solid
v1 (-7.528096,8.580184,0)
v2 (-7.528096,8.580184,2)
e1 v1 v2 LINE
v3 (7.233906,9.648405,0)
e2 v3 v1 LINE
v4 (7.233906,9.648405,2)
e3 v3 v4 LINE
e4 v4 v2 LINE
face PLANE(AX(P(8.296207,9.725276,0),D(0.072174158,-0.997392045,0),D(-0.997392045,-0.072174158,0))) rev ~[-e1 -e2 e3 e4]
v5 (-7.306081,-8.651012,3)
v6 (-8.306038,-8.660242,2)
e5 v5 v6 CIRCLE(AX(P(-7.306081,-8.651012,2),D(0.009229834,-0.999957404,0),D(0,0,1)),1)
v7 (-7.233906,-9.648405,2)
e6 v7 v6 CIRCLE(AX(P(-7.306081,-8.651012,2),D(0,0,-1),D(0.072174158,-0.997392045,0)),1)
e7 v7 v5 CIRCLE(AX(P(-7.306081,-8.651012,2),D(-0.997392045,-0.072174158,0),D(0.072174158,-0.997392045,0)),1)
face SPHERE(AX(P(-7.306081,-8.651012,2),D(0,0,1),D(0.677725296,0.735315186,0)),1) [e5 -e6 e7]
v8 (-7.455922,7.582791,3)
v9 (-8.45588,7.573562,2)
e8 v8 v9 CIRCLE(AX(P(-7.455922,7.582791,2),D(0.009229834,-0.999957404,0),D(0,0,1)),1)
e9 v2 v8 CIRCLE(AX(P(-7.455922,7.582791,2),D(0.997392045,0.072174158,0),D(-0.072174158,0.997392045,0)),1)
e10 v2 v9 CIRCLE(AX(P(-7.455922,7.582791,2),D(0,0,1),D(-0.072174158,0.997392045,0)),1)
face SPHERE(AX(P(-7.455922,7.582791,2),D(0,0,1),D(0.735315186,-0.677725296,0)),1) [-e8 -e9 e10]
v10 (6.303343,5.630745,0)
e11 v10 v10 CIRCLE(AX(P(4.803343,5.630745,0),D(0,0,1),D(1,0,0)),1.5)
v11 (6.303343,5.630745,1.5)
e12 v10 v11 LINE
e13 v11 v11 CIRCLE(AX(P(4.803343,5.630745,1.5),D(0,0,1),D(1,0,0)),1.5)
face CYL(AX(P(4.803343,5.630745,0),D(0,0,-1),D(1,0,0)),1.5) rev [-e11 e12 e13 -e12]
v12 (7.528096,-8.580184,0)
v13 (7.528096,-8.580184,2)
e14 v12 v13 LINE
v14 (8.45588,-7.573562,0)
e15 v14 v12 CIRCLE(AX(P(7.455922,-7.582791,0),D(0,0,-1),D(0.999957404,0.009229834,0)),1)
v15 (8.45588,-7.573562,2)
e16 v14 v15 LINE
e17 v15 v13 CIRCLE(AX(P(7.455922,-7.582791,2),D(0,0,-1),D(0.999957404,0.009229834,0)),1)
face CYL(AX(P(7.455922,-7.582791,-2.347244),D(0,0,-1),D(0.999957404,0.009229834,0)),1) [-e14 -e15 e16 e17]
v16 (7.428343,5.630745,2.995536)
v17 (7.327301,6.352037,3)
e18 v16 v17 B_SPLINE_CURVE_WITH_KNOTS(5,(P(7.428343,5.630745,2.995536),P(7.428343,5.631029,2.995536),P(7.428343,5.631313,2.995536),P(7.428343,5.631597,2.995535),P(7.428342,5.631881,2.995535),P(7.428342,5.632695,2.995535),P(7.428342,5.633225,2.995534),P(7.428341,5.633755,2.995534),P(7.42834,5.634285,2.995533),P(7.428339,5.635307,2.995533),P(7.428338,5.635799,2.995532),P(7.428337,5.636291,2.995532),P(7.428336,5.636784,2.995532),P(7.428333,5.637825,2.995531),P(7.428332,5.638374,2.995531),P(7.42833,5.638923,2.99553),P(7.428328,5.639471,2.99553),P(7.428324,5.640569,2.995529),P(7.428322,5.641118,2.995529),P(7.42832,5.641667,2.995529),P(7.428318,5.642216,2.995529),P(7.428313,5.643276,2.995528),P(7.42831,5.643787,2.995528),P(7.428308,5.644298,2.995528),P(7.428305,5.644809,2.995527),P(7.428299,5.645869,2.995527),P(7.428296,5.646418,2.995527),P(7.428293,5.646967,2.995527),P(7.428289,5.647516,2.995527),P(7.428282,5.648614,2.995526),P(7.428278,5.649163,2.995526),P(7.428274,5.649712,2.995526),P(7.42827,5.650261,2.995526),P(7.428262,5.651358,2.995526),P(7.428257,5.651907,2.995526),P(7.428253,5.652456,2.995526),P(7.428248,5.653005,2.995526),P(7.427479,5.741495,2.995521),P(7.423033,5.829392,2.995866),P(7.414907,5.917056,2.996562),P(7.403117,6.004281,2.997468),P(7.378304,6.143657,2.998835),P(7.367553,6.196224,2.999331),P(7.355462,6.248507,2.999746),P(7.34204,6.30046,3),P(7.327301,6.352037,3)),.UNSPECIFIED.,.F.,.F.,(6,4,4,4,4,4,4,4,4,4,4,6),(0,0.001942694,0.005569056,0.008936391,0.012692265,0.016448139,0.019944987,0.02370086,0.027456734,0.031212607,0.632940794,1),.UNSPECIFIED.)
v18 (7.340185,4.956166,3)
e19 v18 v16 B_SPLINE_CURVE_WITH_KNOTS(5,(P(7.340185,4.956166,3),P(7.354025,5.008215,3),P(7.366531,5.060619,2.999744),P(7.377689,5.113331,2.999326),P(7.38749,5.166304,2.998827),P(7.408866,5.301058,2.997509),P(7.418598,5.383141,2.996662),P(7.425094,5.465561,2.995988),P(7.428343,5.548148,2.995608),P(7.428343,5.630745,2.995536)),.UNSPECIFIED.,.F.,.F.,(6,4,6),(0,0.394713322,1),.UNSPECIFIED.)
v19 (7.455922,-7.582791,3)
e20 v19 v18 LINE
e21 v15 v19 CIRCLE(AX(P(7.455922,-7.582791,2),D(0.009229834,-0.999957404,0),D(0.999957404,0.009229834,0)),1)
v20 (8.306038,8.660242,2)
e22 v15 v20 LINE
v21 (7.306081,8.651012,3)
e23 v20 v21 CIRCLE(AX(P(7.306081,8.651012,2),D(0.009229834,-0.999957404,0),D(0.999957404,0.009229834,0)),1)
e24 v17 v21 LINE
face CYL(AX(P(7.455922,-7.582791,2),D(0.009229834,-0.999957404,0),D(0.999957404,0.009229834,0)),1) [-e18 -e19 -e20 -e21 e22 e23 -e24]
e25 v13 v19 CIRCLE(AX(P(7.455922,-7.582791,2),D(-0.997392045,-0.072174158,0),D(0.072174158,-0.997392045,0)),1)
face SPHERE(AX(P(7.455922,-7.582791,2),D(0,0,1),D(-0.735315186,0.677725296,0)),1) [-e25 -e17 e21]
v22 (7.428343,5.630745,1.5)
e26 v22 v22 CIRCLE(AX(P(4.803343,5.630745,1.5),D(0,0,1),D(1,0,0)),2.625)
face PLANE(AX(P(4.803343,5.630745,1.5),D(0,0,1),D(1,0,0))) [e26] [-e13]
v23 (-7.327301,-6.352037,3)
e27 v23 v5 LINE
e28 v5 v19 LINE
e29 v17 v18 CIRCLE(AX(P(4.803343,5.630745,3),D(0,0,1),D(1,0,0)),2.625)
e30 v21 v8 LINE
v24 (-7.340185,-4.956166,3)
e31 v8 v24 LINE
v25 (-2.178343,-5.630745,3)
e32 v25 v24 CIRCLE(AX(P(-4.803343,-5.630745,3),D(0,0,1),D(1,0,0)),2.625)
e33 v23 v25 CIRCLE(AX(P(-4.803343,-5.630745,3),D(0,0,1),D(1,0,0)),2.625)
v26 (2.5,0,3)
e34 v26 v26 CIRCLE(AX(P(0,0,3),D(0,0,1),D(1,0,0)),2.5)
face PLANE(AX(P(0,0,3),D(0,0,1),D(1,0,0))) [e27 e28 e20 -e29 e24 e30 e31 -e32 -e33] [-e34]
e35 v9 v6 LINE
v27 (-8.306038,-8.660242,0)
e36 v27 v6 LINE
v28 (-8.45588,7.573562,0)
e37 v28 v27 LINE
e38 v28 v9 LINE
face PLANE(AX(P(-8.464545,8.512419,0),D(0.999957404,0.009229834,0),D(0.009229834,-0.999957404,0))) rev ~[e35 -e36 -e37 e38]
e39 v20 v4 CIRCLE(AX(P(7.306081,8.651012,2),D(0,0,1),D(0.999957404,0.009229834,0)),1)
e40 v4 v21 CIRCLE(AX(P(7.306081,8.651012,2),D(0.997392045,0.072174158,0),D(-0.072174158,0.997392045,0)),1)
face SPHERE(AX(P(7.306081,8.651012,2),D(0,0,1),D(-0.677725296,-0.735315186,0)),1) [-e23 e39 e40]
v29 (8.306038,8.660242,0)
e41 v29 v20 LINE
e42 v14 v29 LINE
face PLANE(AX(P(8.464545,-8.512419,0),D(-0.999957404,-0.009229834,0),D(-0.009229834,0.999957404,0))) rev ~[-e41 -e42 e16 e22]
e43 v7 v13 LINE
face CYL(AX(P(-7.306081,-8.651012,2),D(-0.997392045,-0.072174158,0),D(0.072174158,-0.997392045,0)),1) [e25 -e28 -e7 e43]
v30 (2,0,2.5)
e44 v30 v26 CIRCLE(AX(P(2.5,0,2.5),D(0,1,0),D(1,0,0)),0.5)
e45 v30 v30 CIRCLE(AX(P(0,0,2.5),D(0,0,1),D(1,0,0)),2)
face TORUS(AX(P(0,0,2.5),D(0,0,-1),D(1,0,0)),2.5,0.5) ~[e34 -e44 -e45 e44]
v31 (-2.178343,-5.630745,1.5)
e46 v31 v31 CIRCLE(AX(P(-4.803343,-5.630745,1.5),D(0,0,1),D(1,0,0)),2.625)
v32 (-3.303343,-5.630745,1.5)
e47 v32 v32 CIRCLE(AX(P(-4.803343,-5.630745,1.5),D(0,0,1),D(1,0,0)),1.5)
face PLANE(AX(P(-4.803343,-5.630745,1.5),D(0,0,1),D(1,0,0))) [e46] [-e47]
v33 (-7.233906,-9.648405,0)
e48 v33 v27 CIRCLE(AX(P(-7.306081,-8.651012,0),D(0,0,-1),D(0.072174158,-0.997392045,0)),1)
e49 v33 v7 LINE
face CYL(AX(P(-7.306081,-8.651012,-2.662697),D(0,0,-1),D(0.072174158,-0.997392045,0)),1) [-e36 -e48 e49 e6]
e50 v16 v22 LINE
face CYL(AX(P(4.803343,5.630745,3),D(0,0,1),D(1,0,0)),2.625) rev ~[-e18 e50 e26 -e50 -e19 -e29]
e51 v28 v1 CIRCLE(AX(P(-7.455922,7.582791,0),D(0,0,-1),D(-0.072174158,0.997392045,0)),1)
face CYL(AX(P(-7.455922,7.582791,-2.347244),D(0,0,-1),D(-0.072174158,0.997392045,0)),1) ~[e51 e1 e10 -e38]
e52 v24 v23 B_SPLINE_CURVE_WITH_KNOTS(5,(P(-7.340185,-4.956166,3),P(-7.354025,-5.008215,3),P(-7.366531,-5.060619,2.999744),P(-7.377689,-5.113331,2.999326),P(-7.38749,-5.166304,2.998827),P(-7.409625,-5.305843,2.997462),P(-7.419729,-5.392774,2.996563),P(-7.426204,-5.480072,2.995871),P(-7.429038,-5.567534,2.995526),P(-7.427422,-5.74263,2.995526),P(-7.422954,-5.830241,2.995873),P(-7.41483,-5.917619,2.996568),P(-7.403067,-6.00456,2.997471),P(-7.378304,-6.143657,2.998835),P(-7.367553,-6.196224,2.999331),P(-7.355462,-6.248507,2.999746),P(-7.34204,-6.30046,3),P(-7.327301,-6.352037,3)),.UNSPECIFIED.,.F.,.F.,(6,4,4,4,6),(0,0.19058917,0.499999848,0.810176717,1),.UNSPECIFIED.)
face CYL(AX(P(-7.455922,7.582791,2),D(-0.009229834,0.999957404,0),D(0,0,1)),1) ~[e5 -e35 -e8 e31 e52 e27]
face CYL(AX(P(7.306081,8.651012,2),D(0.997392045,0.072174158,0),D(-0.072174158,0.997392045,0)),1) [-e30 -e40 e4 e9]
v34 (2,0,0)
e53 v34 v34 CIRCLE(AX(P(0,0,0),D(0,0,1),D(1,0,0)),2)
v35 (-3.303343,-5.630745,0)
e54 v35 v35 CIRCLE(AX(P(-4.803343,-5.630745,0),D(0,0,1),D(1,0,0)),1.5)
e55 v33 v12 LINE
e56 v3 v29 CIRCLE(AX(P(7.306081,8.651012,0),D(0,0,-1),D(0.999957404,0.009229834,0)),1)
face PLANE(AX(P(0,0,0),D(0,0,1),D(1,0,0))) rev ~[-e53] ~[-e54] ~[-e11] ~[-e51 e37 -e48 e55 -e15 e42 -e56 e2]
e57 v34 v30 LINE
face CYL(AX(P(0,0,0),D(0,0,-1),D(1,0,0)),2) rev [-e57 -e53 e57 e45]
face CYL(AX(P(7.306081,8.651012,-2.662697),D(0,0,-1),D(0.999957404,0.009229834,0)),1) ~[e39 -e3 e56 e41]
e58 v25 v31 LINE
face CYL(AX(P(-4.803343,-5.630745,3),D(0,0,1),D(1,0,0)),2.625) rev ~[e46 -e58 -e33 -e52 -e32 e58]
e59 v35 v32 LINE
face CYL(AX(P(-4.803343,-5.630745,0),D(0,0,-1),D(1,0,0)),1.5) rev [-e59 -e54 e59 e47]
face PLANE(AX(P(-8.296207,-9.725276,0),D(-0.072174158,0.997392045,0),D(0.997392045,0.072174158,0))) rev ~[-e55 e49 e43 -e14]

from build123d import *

# Parameters (mm, degrees)
F0_R         = 1.5
F0_R_2       = 2
F1_DEPTH     = 3
F2_R         = 2.625
F2_R_2       = 1.5
F3_DEPTH     = 1.5
F4_T1_DEPTH  = 4.3472443006
F4_T3_DEPTH  = 16.2344954865
F4_T5_DEPTH  = 14.8006020278
F4_T7_DEPTH  = 4.6626968477
F4_T9_DEPTH  = 16.2344954865
F4_T11_DEPTH = 14.8006020278
F4_T16_DEPTH = 1
F4_T22_DEPTH = 1
F4_T28_DEPTH = 1
F4_T34_DEPTH = 1
F5_R         = 0.5


# Not quite as in the source:
# - a fillet or chamfer that OpenCascade refuses, or shapes differently, is made with other operations: its cross-section is extruded or revolved along the edge and cut away or added


with BuildPart() as f1:
    # F0 (on Top) → F1 (new body)
    with BuildSketch(Plane.XY):
        Polygon((8.4645454874, -8.5124193832), (8.2962074114, 9.7252756798), (-8.4645454874, 8.5124193832), (-8.2962074114, -9.7252756798), align=None)
        with Locations((-4.8033426305, -5.6307453454)):
            Circle(F0_R, mode=Mode.SUBTRACT)
        Polygon((4.02705255, 0.3354530665), (2.3040371523, -3.3198032774), (-1.7230153977, -3.6552563439), (-4.02705255, -0.3354530665), (-2.3040371523, 3.3198032774), (1.7230153977, 3.6552563439), align=None, mode=Mode.SUBTRACT)
        with Locations((4.8033426305, 5.6307453454)):
            Circle(F0_R, mode=Mode.SUBTRACT)
        Polygon((-1.7230153977, -3.6552563439), (2.3040371523, -3.3198032774), (4.02705255, 0.3354530665), (1.7230153977, 3.6552563439), (-2.3040371523, 3.3198032774), (-4.02705255, -0.3354530665), align=None)
        Circle(F0_R_2, mode=Mode.SUBTRACT)
    extrude(amount=F1_DEPTH)

    # F2 (on face) → F3 (cut)
    with BuildSketch(Plane.XY.offset(3)):
        with Locations((-4.8033426305, -5.6307453454)):
            Circle(F2_R)
        with Locations((-4.8033426305, -5.6307453454)):
            Circle(F2_R_2, mode=Mode.SUBTRACT)
        with Locations((4.8033426305, 5.6307453454)):
            Circle(F2_R)
        with Locations((4.8033426305, 5.6307453454)):
            Circle(F2_R_2, mode=Mode.SUBTRACT)
    extrude(amount=-F3_DEPTH, mode=Mode.SUBTRACT)

    # F4: fillet of radius 1 on 8 edges, made by hand

    # F4_s2 → F4_t1 (cut)
    with BuildSketch(Plane.XY.offset(-2.3472443006)):
        with BuildLine():
            ThreePointArc((-7.5280963703, 8.5801835352), (-8.1912373991, 8.2605167863), (-8.4558796169, 7.573561656))
            Line((-8.4558796169, 7.573561656), (-8.4645454874, 8.5124193832))
            Line((-8.4645454874, 8.5124193832), (-7.5280963703, 8.5801835352))
        make_face()
        with BuildLine():
            ThreePointArc((8.4558796169, -7.573561656), (8.1912373991, -8.2605167863), (7.5280963703, -8.5801835352))
            Line((7.5280963703, -8.5801835352), (8.4645454874, -8.5124193832))
            Line((8.4645454874, -8.5124193832), (8.4558796169, -7.573561656))
        make_face()
    extrude(amount=F4_T1_DEPTH, mode=Mode.SUBTRACT)

    # F4_s4 → F4_t3 (cut)
    with BuildSketch(Plane(origin=(-0.0706200975, 7.6509595097, 0), x_dir=(0, 0, 1), z_dir=(0.0092298344, -0.9999574042, 0))):
        with BuildLine():
            ThreePointArc((3, 7.3856167117), (2.7071067812, 8.0927234929), (2, 8.3856167117))
            Line((2, 8.3856167117), (3, 8.3856167117))
            Line((3, 8.3856167117), (3, 7.3856167117))
        make_face()
    extrude(amount=F4_T3_DEPTH, mode=Mode.SUBTRACT)

    # F4_s6 → F4_t5 (cut)
    with BuildSketch(Plane(origin=(7.8907735218, 0.570999072, 0), x_dir=(0, 0, 1), z_dir=(-0.9973920448, -0.0721741576, 0))):
        with BuildLine():
            ThreePointArc((2, 9.1011408148), (2.7071067812, 8.808247596), (3, 8.1011408148))
            Line((3, 8.1011408148), (3, 9.1011408148))
            Line((3, 9.1011408148), (2, 9.1011408148))
        make_face()
    extrude(amount=F4_T5_DEPTH, mode=Mode.SUBTRACT)

    # F4_s8 → F4_t7 (cut)
    with BuildSketch(Plane.XY.offset(-2.6626968477)):
        with BuildLine():
            ThreePointArc((8.3060379118, 8.6602423087), (7.9838058035, 9.3863276607), (7.23390635, 9.648404519))
            Line((7.23390635, 9.648404519), (8.2962074114, 9.7252756798))
            Line((8.2962074114, 9.7252756798), (8.3060379118, 8.6602423087))
        make_face()
        with BuildLine():
            ThreePointArc((-7.23390635, -9.648404519), (-7.9838058035, -9.3863276607), (-8.3060379118, -8.6602423087))
            Line((-8.3060379118, -8.6602423087), (-8.2962074114, -9.7252756798))
            Line((-8.2962074114, -9.7252756798), (-7.23390635, -9.648404519))
        make_face()
    extrude(amount=F4_T7_DEPTH, mode=Mode.SUBTRACT)

    # F4_s10 → F4_t9 (cut)
    with BuildSketch(Plane(origin=(0.0706200975, -7.6509595097, 0), x_dir=(0, 0, 1), z_dir=(-0.0092298344, 0.9999574042, 0))):
        with BuildLine():
            ThreePointArc((2, 8.3856167117), (2.7071067812, 8.0927234929), (3, 7.3856167117))
            Line((3, 7.3856167117), (3, 8.3856167117))
            Line((3, 8.3856167117), (2, 8.3856167117))
        make_face()
    extrude(amount=F4_T9_DEPTH, mode=Mode.SUBTRACT)

    # F4_s12 → F4_t11 (cut)
    with BuildSketch(Plane(origin=(-7.8907735218, -0.570999072, 0), x_dir=(0, 0, 1), z_dir=(0.9973920448, 0.0721741576, 0))):
        with BuildLine():
            ThreePointArc((2, 9.1011408148), (2.7071067812, 8.808247596), (3, 8.1011408148))
            Line((3, 8.1011408148), (3, 9.1011408148))
            Line((3, 9.1011408148), (2, 9.1011408148))
        make_face()
    extrude(amount=F4_T11_DEPTH, mode=Mode.SUBTRACT)


with BuildPart() as f4_tool14:
    # F4_s15 → F4_t16 (new body)
    with BuildSketch(Plane.XY.offset(2)):
        Polygon((-7.4559222127, 7.5827914904), (-8.4558796169, 7.573561656), (-8.4645454874, 8.5124193832), (-7.5280963703, 8.5801835352), align=None)
    extrude(amount=F4_T16_DEPTH)

    # F4_s17 → F4_t18 (revolve, cut)
    with BuildSketch(Plane(origin=(-7.4559222127, 7.5827914904, 2), x_dir=(0.7353151864, -0.6777252959, 0), z_dir=(-0.6777252959, -0.7353151864, 0))):
        with BuildLine():
            ThreePointArc((0, -1), (1, 0), (0, 1))
            Line((0, 1), (0, -1))
        make_face()
    revolve(axis=Axis((-7.4559222127, 7.5827914904, 2), (0, 0, 1)), mode=Mode.SUBTRACT)


with BuildPart() as f1_1:
    add(f1.part)

    # F4_t13: cut F4_tool14
    add(f4_tool14.part, mode=Mode.SUBTRACT)


with BuildPart() as f4_tool20:
    # F4_s21 → F4_t22 (new body)
    with BuildSketch(Plane.XY.offset(2)):
        Polygon((-7.3060805076, -8.6510124742), (-8.3060379118, -8.6602423087), (-8.2962074114, -9.7252756798), (-7.23390635, -9.648404519), align=None)
    extrude(amount=F4_T22_DEPTH)

    # F4_s23 → F4_t24 (revolve, cut)
    with BuildSketch(Plane(origin=(-7.3060805076, -8.6510124742, 2), x_dir=(0.6777252959, 0.7353151864, 0), z_dir=(0.7353151864, -0.6777252959, 0))):
        with BuildLine():
            ThreePointArc((0, -1), (1, 0), (0, 1))
            Line((0, 1), (0, -1))
        make_face()
    revolve(axis=Axis((-7.3060805076, -8.6510124742, 2), (0, 0, 1)), mode=Mode.SUBTRACT)


with BuildPart() as f1_2:
    add(f1_1.part)

    # F4_t19: cut F4_tool20
    add(f4_tool20.part, mode=Mode.SUBTRACT)


with BuildPart() as f4_tool26:
    # F4_s27 → F4_t28 (new body)
    with BuildSketch(Plane.XY.offset(2)):
        Polygon((7.3060805076, 8.6510124742), (8.3060379118, 8.6602423087), (8.2962074114, 9.7252756798), (7.23390635, 9.648404519), align=None)
    extrude(amount=F4_T28_DEPTH)

    # F4_s29 → F4_t30 (revolve, cut)
    with BuildSketch(Plane(origin=(7.3060805076, 8.6510124742, 2), x_dir=(-0.6777252959, -0.7353151864, 0), z_dir=(-0.7353151864, 0.6777252959, 0))):
        with BuildLine():
            ThreePointArc((0, -1), (1, 0), (0, 1))
            Line((0, 1), (0, -1))
        make_face()
    revolve(axis=Axis((7.3060805076, 8.6510124742, 2), (0, 0, 1)), mode=Mode.SUBTRACT)


with BuildPart() as f1_3:
    add(f1_2.part)

    # F4_t25: cut F4_tool26
    add(f4_tool26.part, mode=Mode.SUBTRACT)


with BuildPart() as f4_tool32:
    # F4_s33 → F4_t34 (new body)
    with BuildSketch(Plane.XY.offset(2)):
        Polygon((7.4559222127, -7.5827914904), (8.4558796169, -7.573561656), (8.4645454874, -8.5124193832), (7.5280963703, -8.5801835352), align=None)
    extrude(amount=F4_T34_DEPTH)

    # F4_s35 → F4_t36 (revolve, cut)
    with BuildSketch(Plane(origin=(7.4559222127, -7.5827914904, 2), x_dir=(-0.7353151864, 0.6777252959, 0), z_dir=(0.6777252959, 0.7353151864, 0))):
        with BuildLine():
            ThreePointArc((0, -1), (1, 0), (0, 1))
            Line((0, 1), (0, -1))
        make_face()
    revolve(axis=Axis((7.4559222127, -7.5827914904, 2), (0, 0, 1)), mode=Mode.SUBTRACT)


with BuildPart() as f1_4:
    add(f1_3.part)

    # F4_t31: cut F4_tool32
    add(f4_tool32.part, mode=Mode.SUBTRACT)

    # F5
    f5_edges = [f1_4.edges().sort_by_distance(p)[0] for p in [
        (-2, 0, 3),
    ]]
    fillet(f5_edges, radius=F5_R)


solid = f1_4.part
